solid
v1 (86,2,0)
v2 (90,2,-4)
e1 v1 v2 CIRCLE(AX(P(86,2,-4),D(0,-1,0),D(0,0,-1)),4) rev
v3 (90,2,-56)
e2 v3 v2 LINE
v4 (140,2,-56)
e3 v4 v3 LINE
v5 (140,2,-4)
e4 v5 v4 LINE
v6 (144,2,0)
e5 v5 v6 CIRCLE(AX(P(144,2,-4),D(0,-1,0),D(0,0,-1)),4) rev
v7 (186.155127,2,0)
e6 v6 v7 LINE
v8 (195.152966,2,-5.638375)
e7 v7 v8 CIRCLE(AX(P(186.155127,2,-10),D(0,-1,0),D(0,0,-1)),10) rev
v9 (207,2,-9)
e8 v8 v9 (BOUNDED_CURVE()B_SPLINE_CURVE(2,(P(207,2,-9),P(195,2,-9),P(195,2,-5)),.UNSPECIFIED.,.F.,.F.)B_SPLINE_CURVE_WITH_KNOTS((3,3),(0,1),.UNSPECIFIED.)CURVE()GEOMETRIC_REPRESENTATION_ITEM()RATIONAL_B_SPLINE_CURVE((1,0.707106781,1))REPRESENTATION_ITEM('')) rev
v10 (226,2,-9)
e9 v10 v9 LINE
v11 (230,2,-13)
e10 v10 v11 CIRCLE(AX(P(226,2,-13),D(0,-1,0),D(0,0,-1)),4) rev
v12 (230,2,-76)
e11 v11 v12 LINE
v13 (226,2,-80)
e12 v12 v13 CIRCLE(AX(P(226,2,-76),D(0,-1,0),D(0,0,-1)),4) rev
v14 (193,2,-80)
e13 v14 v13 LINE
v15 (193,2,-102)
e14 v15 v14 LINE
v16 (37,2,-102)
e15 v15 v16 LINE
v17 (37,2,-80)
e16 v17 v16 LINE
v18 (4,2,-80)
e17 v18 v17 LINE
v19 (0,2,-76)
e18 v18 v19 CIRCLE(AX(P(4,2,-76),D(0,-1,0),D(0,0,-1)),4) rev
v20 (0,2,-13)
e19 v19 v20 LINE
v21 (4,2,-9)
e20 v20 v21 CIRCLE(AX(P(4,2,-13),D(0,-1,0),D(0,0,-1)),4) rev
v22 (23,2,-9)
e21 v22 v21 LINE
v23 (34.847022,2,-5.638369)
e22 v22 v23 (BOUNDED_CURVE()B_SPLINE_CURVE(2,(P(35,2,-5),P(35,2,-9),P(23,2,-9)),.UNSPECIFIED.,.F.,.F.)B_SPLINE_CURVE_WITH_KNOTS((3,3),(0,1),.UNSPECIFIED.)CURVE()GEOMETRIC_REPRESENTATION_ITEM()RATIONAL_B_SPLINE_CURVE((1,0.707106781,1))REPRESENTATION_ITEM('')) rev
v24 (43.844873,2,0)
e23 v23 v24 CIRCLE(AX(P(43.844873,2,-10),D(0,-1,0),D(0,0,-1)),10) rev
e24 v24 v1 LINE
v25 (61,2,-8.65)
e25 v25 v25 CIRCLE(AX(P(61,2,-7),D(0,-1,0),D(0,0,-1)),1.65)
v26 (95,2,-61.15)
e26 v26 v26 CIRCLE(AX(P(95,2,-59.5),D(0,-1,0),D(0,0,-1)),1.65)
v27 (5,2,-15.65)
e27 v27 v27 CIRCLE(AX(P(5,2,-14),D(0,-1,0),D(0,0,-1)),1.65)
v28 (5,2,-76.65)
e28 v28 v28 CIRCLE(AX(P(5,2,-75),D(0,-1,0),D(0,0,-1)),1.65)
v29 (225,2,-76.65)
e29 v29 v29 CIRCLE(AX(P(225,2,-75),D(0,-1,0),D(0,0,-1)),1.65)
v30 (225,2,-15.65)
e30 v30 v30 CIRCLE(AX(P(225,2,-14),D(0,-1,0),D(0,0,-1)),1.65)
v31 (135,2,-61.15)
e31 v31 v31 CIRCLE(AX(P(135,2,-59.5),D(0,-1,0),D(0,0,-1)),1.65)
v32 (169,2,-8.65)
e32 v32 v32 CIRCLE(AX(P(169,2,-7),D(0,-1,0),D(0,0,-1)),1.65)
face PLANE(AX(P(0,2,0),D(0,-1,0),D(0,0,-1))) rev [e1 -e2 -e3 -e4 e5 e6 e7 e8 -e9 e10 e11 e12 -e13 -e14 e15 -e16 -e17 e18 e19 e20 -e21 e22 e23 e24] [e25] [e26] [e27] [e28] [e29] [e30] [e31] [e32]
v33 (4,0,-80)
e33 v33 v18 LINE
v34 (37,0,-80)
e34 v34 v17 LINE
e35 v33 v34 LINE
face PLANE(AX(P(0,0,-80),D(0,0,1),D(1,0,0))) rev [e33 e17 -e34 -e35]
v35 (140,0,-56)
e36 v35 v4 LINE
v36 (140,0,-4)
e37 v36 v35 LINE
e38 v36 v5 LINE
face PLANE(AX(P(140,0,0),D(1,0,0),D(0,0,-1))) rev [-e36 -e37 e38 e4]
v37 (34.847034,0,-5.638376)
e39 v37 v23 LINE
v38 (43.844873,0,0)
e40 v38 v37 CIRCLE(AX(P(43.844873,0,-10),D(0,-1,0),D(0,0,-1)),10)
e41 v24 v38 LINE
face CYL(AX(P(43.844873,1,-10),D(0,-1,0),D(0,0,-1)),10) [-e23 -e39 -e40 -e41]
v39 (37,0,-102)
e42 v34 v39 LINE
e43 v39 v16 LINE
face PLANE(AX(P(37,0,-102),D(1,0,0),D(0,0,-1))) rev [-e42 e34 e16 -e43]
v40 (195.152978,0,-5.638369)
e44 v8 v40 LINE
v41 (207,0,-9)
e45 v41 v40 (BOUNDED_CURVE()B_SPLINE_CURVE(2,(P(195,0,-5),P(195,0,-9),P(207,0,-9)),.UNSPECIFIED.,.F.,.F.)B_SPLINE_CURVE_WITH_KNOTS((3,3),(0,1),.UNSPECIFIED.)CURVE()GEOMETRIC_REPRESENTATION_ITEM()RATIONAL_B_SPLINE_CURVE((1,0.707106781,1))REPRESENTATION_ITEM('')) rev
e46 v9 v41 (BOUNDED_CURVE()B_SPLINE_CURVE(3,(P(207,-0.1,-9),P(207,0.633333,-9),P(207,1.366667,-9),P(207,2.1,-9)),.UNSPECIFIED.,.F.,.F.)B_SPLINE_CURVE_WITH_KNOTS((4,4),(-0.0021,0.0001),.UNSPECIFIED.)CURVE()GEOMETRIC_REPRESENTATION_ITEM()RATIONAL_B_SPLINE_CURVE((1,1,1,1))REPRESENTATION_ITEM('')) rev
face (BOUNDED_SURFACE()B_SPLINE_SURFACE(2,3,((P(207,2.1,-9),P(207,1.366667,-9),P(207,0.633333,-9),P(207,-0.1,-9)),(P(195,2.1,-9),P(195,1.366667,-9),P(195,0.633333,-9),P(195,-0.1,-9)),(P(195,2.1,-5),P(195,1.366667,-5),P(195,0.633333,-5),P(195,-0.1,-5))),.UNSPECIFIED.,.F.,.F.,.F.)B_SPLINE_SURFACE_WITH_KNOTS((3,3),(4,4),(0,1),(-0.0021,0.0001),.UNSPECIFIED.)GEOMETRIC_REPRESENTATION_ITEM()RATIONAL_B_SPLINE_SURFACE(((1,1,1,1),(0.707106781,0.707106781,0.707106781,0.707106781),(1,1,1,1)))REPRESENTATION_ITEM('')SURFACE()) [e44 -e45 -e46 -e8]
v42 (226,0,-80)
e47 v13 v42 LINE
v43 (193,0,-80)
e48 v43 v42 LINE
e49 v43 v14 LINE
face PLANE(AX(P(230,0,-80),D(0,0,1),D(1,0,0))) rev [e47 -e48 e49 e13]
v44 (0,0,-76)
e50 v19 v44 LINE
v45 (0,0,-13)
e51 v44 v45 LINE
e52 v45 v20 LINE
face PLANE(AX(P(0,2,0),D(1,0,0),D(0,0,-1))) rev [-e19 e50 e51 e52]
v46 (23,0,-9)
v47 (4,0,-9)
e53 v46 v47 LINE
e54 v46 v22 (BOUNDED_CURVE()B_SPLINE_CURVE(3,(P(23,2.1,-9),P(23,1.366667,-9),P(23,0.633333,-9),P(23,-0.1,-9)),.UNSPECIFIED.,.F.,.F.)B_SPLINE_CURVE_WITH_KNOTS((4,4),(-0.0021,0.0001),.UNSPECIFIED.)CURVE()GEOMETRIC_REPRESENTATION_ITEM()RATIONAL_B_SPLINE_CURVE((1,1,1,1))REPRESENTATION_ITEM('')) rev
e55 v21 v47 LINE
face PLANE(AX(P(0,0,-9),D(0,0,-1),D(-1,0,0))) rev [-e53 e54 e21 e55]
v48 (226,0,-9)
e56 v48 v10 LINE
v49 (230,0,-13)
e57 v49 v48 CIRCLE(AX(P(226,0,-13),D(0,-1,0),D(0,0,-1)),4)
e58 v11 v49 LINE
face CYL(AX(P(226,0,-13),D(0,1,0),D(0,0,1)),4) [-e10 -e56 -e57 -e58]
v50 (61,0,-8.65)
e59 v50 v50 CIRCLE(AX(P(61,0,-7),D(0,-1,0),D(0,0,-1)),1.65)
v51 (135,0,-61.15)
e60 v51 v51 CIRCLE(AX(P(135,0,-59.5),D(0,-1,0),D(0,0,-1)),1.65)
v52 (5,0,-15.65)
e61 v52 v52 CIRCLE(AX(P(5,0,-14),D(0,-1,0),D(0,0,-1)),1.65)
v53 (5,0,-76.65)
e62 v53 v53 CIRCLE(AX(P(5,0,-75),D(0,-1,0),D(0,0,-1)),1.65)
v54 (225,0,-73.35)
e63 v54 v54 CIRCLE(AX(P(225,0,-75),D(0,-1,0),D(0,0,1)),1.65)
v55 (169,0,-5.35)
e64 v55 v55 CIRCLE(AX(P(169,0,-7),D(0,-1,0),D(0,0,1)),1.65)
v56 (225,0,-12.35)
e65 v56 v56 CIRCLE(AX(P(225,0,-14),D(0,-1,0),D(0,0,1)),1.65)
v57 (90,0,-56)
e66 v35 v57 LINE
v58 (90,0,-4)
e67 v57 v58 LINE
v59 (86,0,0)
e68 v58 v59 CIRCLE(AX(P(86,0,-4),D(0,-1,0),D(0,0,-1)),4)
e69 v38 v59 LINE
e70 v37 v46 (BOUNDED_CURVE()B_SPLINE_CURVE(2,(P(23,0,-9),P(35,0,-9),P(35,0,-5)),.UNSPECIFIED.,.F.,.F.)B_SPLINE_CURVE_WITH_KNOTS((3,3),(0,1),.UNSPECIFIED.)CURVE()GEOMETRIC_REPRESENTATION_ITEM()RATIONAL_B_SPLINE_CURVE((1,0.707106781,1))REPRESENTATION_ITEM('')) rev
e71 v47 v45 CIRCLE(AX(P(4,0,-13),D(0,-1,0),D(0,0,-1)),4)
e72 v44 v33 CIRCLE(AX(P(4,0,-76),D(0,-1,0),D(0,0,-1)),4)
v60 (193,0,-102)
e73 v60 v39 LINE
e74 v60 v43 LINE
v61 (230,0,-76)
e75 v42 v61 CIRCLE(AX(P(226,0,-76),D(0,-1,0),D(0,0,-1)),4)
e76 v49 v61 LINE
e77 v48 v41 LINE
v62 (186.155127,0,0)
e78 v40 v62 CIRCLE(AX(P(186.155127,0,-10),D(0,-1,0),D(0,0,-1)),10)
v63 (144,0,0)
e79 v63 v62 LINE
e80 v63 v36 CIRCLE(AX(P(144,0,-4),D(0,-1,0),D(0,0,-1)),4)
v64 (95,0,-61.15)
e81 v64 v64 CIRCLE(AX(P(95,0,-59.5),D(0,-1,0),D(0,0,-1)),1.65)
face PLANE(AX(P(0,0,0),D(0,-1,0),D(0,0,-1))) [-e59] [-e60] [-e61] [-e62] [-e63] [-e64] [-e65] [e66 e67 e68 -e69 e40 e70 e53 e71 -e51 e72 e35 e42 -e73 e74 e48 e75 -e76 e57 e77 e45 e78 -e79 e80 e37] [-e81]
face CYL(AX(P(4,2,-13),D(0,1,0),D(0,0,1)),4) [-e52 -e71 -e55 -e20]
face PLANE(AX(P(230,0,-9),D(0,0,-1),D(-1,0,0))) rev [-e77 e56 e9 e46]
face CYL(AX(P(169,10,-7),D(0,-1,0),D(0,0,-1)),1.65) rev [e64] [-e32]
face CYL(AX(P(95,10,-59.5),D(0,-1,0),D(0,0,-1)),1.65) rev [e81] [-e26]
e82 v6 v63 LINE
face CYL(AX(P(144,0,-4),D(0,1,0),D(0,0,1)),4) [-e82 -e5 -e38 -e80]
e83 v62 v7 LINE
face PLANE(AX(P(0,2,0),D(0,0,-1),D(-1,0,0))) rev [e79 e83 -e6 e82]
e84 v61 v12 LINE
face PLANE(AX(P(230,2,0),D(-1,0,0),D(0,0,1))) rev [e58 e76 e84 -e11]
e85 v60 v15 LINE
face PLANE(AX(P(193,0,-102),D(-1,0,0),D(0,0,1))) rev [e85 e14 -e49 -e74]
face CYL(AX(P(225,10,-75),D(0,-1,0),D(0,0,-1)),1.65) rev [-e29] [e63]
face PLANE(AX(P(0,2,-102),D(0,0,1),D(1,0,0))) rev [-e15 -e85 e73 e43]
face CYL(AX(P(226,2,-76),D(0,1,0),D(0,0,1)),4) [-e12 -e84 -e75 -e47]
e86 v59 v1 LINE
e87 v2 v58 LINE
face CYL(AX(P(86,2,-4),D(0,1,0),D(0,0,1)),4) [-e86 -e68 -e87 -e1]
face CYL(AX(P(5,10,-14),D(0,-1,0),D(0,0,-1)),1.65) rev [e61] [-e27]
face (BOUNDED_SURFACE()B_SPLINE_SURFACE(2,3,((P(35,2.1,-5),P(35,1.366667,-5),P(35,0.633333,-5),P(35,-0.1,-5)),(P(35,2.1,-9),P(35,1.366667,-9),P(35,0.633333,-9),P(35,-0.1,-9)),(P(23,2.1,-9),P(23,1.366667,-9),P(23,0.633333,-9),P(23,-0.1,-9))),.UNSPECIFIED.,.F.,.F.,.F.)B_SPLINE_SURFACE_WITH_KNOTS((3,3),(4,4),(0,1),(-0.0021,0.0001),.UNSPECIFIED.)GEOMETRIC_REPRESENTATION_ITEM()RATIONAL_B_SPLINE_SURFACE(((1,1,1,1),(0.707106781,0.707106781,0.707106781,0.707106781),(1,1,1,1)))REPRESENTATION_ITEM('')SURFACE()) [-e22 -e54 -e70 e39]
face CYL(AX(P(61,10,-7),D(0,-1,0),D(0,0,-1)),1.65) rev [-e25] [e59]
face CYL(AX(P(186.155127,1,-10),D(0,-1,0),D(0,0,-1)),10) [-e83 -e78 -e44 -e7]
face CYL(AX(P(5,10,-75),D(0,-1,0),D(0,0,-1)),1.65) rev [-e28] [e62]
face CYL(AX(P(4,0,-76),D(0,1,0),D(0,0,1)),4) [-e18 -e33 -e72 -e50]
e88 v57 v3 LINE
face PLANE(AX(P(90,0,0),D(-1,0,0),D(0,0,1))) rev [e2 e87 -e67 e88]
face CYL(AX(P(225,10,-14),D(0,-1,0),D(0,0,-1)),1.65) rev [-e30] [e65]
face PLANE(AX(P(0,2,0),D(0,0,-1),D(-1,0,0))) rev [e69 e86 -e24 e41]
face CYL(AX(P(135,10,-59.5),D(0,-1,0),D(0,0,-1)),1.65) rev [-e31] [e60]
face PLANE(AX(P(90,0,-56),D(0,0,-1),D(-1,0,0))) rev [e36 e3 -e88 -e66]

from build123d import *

# Parameters (mm, degrees)
SKETCH1_W           = 230
SKETCH1_H           = 102
BOSS_EXTRUDE1_DEPTH = 2
SKETCH2_W           = 37
SKETCH2_H           = 22
SKETCH2_W_2         = 35
SKETCH2_H_2         = 9
SKETCH2_W_3         = 50
SKETCH2_H_3         = 56
CUT_EXTRUDE1_DEPTH  = 252.610810579
SKETCH3_R           = 1.65
CUT_EXTRUDE2_DEPTH  = 10
FILLET1_R           = 4
FILLET2_SIZE        = 4
FILLET2_SIZE_2      = 12
FILLET3_R           = 10
SKETCH4_R           = 1.65
CUT_EXTRUDE3_DEPTH  = 10


with BuildPart() as part:
    # Sketch1 → Boss-Extrude1 (new body)
    with BuildSketch(Plane(origin=(0, 0, 0), x_dir=(1, 0, 0), z_dir=(0, 1, 0))):
        with Locations((115, 51)):
            Rectangle(SKETCH1_W, SKETCH1_H)
    extrude(amount=BOSS_EXTRUDE1_DEPTH)

    # Sketch2 → Cut-Extrude1 (cut, through all)
    with BuildSketch(Plane(origin=(0, 2, 0), x_dir=(1, 0, 0), z_dir=(0, 1, 0))):
        with Locations((18.5, 91)):
            Rectangle(SKETCH2_W, SKETCH2_H)
        with Locations((17.5, 4.5)):
            Rectangle(SKETCH2_W_2, SKETCH2_H_2)
        with Locations((211.5, 91)):
            Rectangle(SKETCH2_W, SKETCH2_H)
        with Locations((212.5, 4.5)):
            Rectangle(SKETCH2_W_2, SKETCH2_H_2)
        with Locations((115, 28)):
            Rectangle(SKETCH2_W_3, SKETCH2_H_3)
    extrude(amount=-CUT_EXTRUDE1_DEPTH, mode=Mode.SUBTRACT)

    # Sketch3 → Cut-Extrude2 (cut)
    with BuildSketch(Plane.XZ):
        with Locations(Location((5, -14, 0), (0, 0, 270))):
            Circle(SKETCH3_R)
        with Locations(Location((5, -75, 0), (0, 0, 270))):
            Circle(SKETCH3_R)
        with Locations(Location((95, -59.5, 0), (0, 0, 270))):
            Circle(SKETCH3_R)
        with Locations(Location((135, -59.5, 0), (0, 0, 270))):
            Circle(SKETCH3_R)
        with Locations(Location((225, -14, 0), (0, 0, 270))):
            Circle(SKETCH3_R)
        with Locations(Location((225, -75, 0), (0, 0, 270))):
            Circle(SKETCH3_R)
    extrude(amount=-CUT_EXTRUDE2_DEPTH, mode=Mode.SUBTRACT)

    # Fillet1
    fillet1_edges = [part.edges().sort_by_distance(p)[0] for p in [
        (0, 1, -9),
        (230, 1, -80),
        (230, 1, -9),
        (90, 1, 0),
        (140, 1, 0),
        (0, 1, -80),
    ]]
    fillet(fillet1_edges, radius=FILLET1_R)

    # Fillet2
    # an asymmetric fillet: 12, 4 mm, written as the material it adds along each edge
    with BuildSketch(Plane(origin=(195, 2, -9), x_dir=(0, 0, 1), z_dir=(0, -1, 0))) as fillet2_piece_1:
        with BuildLine():
            Bezier((FILLET2_SIZE, 0), (0, 0), (0, -FILLET2_SIZE_2), weights=[1, 0.707106781, 1])
            Line((0, -FILLET2_SIZE_2), (0, 0))
            Line((0, 0), (FILLET2_SIZE, 0))
        make_face()
    extrude(amount=2)
    with BuildSketch(Plane(origin=(35, 2, -9), x_dir=(0, 0, 1), z_dir=(0, -1, 0))) as fillet2_piece_2:
        with BuildLine():
            Bezier((FILLET2_SIZE, 0), (0, 0), (0, FILLET2_SIZE_2), weights=[1, 0.707106781, 1])
            Line((0, FILLET2_SIZE_2), (0, 0))
            Line((0, 0), (FILLET2_SIZE, 0))
        make_face()
    extrude(amount=2)

    # Fillet3
    fillet3_edges = [part.edges().sort_by_distance(p)[0] for p in [
        (35, 1, 0),
        (195, 1, 0),
    ]]
    fillet(fillet3_edges, radius=FILLET3_R)

    # Sketch4 → Cut-Extrude3 (cut)
    with BuildSketch(Plane.XZ):
        with Locations(Location((61, -7, 0), (0, 0, 270))):
            Circle(SKETCH4_R)
        with Locations(Location((169, -7, 0), (0, 0, 270))):
            Circle(SKETCH4_R)
    extrude(amount=-CUT_EXTRUDE3_DEPTH, mode=Mode.SUBTRACT)


solid = part.part
